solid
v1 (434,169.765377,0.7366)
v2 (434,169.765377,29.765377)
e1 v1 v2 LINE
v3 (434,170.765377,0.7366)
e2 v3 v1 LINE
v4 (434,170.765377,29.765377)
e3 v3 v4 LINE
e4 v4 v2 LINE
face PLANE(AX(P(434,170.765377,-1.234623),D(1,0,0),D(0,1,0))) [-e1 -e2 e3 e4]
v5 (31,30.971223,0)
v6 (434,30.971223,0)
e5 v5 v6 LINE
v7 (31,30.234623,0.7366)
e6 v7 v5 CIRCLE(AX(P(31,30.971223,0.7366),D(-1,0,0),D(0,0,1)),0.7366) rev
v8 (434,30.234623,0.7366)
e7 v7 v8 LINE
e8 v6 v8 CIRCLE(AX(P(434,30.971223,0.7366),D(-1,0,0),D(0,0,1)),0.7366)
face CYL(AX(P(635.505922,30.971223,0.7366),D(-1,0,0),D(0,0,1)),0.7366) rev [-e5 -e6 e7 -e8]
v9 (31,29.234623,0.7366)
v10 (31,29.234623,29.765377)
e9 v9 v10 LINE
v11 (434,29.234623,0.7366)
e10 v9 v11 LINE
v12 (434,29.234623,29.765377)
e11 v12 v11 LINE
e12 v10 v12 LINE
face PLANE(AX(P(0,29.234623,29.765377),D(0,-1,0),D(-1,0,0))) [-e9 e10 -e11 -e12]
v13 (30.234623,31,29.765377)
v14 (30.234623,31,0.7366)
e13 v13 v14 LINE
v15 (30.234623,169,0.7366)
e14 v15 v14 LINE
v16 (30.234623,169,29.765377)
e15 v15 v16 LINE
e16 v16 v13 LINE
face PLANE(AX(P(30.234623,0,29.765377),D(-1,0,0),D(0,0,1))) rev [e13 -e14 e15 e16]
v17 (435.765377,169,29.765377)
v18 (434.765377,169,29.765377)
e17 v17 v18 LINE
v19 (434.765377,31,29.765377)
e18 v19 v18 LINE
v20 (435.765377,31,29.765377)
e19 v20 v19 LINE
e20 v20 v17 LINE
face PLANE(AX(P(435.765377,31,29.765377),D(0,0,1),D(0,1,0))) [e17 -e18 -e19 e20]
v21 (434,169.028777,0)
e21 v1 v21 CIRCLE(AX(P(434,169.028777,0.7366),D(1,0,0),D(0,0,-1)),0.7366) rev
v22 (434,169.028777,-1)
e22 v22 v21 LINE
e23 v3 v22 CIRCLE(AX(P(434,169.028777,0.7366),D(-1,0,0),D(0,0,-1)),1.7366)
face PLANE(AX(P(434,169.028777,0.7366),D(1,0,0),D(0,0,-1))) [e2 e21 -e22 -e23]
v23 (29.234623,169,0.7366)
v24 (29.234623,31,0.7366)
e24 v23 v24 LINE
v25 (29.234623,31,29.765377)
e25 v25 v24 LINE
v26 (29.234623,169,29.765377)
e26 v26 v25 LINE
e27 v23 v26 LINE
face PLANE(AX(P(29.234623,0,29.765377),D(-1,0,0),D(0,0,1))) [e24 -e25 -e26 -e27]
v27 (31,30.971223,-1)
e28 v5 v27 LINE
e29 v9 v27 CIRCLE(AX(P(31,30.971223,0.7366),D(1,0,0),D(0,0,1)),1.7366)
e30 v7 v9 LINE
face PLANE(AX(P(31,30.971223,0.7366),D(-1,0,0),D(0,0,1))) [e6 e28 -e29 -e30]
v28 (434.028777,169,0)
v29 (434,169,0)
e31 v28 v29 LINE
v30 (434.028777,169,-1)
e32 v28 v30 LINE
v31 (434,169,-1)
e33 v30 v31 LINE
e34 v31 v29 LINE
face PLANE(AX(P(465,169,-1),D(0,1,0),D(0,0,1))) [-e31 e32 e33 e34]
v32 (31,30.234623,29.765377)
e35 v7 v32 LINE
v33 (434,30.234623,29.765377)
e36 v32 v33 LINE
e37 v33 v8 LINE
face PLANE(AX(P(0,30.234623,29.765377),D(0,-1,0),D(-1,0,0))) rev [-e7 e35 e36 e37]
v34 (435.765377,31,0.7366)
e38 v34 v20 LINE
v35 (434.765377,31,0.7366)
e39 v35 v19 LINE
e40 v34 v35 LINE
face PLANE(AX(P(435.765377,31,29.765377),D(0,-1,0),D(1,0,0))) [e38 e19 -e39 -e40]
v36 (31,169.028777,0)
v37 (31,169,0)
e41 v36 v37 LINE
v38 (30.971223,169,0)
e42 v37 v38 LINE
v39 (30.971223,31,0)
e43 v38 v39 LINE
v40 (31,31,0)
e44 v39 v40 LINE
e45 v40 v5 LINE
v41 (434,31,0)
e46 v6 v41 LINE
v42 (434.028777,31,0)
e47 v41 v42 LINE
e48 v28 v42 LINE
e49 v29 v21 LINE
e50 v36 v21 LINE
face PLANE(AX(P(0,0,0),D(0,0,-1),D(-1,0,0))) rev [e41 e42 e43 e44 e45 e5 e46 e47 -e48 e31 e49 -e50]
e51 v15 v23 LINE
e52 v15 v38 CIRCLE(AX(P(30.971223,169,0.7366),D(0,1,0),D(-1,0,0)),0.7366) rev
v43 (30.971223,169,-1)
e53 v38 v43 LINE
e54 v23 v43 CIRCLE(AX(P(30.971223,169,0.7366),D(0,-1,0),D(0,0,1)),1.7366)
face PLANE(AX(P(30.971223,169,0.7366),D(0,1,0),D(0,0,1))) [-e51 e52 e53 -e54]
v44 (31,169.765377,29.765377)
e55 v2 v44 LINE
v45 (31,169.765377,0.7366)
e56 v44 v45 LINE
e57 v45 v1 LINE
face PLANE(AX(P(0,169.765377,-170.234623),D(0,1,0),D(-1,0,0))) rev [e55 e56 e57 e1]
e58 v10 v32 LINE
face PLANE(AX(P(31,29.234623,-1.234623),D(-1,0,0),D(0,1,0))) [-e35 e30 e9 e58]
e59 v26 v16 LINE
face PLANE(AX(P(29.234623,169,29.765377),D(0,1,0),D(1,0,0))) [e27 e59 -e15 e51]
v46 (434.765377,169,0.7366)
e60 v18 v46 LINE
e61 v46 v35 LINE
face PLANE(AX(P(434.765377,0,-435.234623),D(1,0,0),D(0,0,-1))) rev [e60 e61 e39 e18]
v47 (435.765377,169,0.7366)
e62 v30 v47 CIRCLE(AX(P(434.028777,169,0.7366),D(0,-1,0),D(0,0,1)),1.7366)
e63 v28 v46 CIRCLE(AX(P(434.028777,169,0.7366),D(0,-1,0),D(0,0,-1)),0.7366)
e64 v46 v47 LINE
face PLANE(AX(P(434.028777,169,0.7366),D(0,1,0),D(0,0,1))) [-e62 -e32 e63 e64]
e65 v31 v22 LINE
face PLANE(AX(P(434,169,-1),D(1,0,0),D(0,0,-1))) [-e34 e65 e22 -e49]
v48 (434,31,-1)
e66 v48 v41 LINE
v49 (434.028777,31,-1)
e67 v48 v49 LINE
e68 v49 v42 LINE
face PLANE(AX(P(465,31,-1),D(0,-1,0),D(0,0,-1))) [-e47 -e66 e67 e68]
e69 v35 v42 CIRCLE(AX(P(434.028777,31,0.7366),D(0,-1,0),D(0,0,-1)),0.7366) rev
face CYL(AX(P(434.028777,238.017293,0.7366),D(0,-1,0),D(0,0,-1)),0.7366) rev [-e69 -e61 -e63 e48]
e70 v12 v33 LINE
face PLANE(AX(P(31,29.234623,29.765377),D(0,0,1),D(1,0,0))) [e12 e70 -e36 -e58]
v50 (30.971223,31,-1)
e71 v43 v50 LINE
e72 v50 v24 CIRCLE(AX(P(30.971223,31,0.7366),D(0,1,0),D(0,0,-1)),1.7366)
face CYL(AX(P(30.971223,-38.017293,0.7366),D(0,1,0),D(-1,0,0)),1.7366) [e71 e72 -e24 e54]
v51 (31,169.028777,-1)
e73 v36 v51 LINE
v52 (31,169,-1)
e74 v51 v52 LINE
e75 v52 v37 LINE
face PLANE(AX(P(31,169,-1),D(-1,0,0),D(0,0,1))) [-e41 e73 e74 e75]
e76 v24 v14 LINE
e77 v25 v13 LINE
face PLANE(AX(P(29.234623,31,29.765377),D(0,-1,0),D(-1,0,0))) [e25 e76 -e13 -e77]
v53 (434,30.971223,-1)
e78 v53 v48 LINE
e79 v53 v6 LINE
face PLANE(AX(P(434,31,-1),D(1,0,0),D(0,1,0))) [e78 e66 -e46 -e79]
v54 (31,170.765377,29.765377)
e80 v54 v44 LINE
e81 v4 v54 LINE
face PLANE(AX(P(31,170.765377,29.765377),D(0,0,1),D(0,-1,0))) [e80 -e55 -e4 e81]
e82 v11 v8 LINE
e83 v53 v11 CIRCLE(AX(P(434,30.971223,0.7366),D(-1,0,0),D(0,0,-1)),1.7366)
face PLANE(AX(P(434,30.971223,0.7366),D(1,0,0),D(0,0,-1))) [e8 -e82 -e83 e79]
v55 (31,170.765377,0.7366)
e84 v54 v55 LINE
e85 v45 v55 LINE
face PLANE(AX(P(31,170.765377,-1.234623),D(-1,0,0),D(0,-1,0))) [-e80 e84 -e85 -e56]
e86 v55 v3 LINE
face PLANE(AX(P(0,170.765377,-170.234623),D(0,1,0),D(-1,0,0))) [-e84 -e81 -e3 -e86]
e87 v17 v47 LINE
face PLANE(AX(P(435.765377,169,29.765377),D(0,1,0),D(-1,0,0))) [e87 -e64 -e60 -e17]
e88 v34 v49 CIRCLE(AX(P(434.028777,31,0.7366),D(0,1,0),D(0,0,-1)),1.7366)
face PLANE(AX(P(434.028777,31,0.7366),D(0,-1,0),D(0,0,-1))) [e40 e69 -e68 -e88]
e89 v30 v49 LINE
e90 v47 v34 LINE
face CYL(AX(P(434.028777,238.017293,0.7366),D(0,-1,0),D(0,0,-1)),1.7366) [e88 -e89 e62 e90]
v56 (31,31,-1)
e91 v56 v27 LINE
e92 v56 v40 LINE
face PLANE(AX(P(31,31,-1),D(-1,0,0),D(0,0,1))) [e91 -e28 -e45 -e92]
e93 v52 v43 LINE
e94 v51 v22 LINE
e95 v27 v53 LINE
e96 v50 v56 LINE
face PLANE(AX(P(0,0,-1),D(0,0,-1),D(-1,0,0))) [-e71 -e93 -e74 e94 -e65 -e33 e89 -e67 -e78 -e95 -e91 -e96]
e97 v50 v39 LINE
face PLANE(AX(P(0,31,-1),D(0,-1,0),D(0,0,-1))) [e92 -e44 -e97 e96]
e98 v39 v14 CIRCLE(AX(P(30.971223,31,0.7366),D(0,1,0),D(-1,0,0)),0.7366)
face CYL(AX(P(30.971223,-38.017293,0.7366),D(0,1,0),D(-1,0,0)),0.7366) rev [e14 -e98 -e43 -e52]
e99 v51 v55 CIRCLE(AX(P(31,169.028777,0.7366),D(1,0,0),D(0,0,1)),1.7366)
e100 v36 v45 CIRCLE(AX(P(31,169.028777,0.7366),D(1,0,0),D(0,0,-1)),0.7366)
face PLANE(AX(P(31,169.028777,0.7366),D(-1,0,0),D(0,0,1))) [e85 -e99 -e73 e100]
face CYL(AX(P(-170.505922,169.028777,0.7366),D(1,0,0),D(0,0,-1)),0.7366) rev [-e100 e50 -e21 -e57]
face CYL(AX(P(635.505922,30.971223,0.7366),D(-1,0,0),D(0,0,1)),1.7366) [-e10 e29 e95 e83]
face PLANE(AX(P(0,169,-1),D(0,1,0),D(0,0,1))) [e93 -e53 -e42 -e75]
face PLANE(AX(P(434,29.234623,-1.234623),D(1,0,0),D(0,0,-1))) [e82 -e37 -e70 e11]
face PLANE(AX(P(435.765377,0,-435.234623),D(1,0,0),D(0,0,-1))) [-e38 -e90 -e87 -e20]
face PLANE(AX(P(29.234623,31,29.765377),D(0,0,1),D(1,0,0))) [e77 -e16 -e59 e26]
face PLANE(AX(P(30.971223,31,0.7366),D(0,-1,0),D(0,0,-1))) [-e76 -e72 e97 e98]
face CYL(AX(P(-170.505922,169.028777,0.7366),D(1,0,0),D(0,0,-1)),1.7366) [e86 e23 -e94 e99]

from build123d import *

# Parameters (mm, degrees)
BASE_FLANGE1_DEPTH         = 1
SKETCHED_START             = 31
SKETCHED_BEND1_DEPTH       = 138
SKETCHED_BEND1_2_DEPTH     = 403
SKETCHED_BEND1_3_OUTLINE_W = 403
SKETCHED_BEND1_3_OUTLINE_H = 1
SKETCHED_BEND1_3_DEPTH     = 29.234623369
SKETCHED_START_2           = 170.765376631
SKETCHED_BEND1_4_OUTLINE_W = 403
SKETCHED_BEND1_4_OUTLINE_H = 1
SKETCHED_BEND1_4_DEPTH     = 29.234623369
SKETCHED_BEND1_5_DEPTH     = 138
SKETCHED_BEND1_6_DEPTH     = 403
SKETCHED_BEND1_7_OUTLINE_W = 138
SKETCHED_BEND1_7_OUTLINE_H = 1
SKETCHED_BEND1_7_DEPTH     = 29.234623369
SKETCHED_START_3           = 435.765376631
SKETCHED_BEND1_8_OUTLINE_W = 138
SKETCHED_BEND1_8_OUTLINE_H = 1
SKETCHED_BEND1_8_DEPTH     = 29.234623369


# Read off the part's stored shape, not the designer's step: Sketched Bend1
# Sheet-metal steps are written as plain solids
with BuildPart() as part:
    # Sketch1 → Base-Flange1 (new body)
    with BuildSketch(Plane.XY):
        Polygon((0, 169), (31, 169), (31, 200), (434, 200), (434, 169), (465, 169), (465, 31), (434, 31), (434, 0), (31, 0), (31, 31), (0, 31), align=None)
    extrude(amount=-BASE_FLANGE1_DEPTH)

    # Sketched Bend1 outline → Sketched Bend1 (add)
    with BuildSketch(Plane(origin=(0, 0, 0), x_dir=(1, 0, 0), z_dir=(0, 1, 0)).offset(SKETCHED_START)):
        with BuildLine():
            Line((29.234623369, -0.7366), (29.234623369, -29.765376631))
            Line((29.234623369, -29.765376631), (30.234623369, -29.765376631))
            Line((30.234623369, -29.765376631), (30.234623369, -0.7366))
            ThreePointArc((30.234623369, -0.7366), (30.450368514, -0.215745145), (30.971223369, 0))
            Line((30.971223369, 0), (29.398582279, 0))
            ThreePointArc((29.398582279, 0), (29.276108612, -0.359286442), (29.234623369, -0.7366))
        make_face()
        with BuildLine():
            Line((435.601417721, 0), (434.028776631, 0))
            ThreePointArc((434.028776631, 0), (434.549631486, -0.215745145), (434.765376631, -0.7366))
            Line((434.765376631, -0.7366), (434.765376631, -29.765376631))
            Line((434.765376631, -29.765376631), (435.765376631, -29.765376631))
            Line((435.765376631, -29.765376631), (435.765376631, -0.7366))
            ThreePointArc((435.765376631, -0.7366), (435.723891388, -0.359286442), (435.601417721, 0))
        make_face()
    extrude(amount=SKETCHED_BEND1_DEPTH)

    # Sketched Bend1 2 outline → Sketched Bend1 2 (add)
    with BuildSketch(Plane.YZ.offset(SKETCHED_START)):
        with BuildLine():
            Line((169.028776631, 0), (170.601417721, 0))
            ThreePointArc((170.601417721, 0), (170.723891388, 0.359286442), (170.765376631, 0.7366))
            Line((170.765376631, 0.7366), (170.765376631, 29.765376631))
            Line((170.765376631, 29.765376631), (169.765376631, 29.765376631))
            Line((169.765376631, 29.765376631), (169.765376631, 0.7366))
            ThreePointArc((169.765376631, 0.7366), (169.549631486, 0.215745145), (169.028776631, 0))
        make_face()
        with BuildLine():
            ThreePointArc((29.234623369, 0.7366), (29.276108612, 0.359286442), (29.398582279, 0))
            Line((29.398582279, 0), (30.971223369, 0))
            ThreePointArc((30.971223369, 0), (30.450368514, 0.215745145), (30.234623369, 0.7366))
            Line((30.234623369, 0.7366), (30.234623369, 29.765376631))
            Line((30.234623369, 29.765376631), (29.234623369, 29.765376631))
            Line((29.234623369, 29.765376631), (29.234623369, 0.7366))
        make_face()
    extrude(amount=SKETCHED_BEND1_2_DEPTH)

    # Sketched Bend1 3 outline → Sketched Bend1 3 (cut)
    with BuildSketch(Plane(origin=(0, 0, 0), x_dir=(1, 0, 0), z_dir=(0, 1, 0))):
        with Locations((232.5, 0.5)):
            Rectangle(SKETCHED_BEND1_3_OUTLINE_W, SKETCHED_BEND1_3_OUTLINE_H)
    extrude(amount=SKETCHED_BEND1_3_DEPTH, mode=Mode.SUBTRACT)

    # Sketched Bend1 4 outline → Sketched Bend1 4 (cut)
    with BuildSketch(Plane(origin=(0, 0, 0), x_dir=(1, 0, 0), z_dir=(0, 1, 0)).offset(SKETCHED_START_2)):
        with Locations((232.5, 0.5)):
            Rectangle(SKETCHED_BEND1_4_OUTLINE_W, SKETCHED_BEND1_4_OUTLINE_H)
    extrude(amount=SKETCHED_BEND1_4_DEPTH, mode=Mode.SUBTRACT)

    # Sketched Bend1 5 outline → Sketched Bend1 5 (cut)
    with BuildSketch(Plane(origin=(0, 0, 0), x_dir=(1, 0, 0), z_dir=(0, 1, 0)).offset(SKETCHED_START)):
        with BuildLine():
            Line((0, 0), (29.398582279, 0))
            ThreePointArc((29.398582279, 0), (30.039397205, 0.728828115), (30.971223369, 1))
            Line((30.971223369, 1), (0, 1))
            Line((0, 1), (0, 0))
        make_face()
        with BuildLine():
            Line((465, 1), (434.028776631, 1))
            ThreePointArc((434.028776631, 1), (434.960602795, 0.728828115), (435.601417721, 0))
            Line((435.601417721, 0), (465, 0))
            Line((465, 0), (465, 1))
        make_face()
    extrude(amount=SKETCHED_BEND1_5_DEPTH, mode=Mode.SUBTRACT)

    # Sketched Bend1 6 outline → Sketched Bend1 6 (cut)
    with BuildSketch(Plane.YZ.offset(SKETCHED_START)):
        with BuildLine():
            ThreePointArc((170.601417721, 0), (169.960602795, -0.728828115), (169.028776631, -1))
            Line((169.028776631, -1), (200, -1))
            Line((200, -1), (200, 0))
            Line((200, 0), (170.601417721, 0))
        make_face()
        with BuildLine():
            Line((0, -1), (30.971223369, -1))
            ThreePointArc((30.971223369, -1), (30.039397205, -0.728828115), (29.398582279, 0))
            Line((29.398582279, 0), (0, 0))
            Line((0, 0), (0, -1))
        make_face()
    extrude(amount=SKETCHED_BEND1_6_DEPTH, mode=Mode.SUBTRACT)

    # Sketched Bend1 7 outline → Sketched Bend1 7 (cut)
    with BuildSketch(Plane.YZ):
        with Locations((100, -0.5)):
            Rectangle(SKETCHED_BEND1_7_OUTLINE_W, SKETCHED_BEND1_7_OUTLINE_H)
    extrude(amount=SKETCHED_BEND1_7_DEPTH, mode=Mode.SUBTRACT)

    # Sketched Bend1 8 outline → Sketched Bend1 8 (cut)
    with BuildSketch(Plane.YZ.offset(SKETCHED_START_3)):
        with Locations((100, -0.5)):
            Rectangle(SKETCHED_BEND1_8_OUTLINE_W, SKETCHED_BEND1_8_OUTLINE_H)
    extrude(amount=SKETCHED_BEND1_8_DEPTH, mode=Mode.SUBTRACT)


solid = part.part
